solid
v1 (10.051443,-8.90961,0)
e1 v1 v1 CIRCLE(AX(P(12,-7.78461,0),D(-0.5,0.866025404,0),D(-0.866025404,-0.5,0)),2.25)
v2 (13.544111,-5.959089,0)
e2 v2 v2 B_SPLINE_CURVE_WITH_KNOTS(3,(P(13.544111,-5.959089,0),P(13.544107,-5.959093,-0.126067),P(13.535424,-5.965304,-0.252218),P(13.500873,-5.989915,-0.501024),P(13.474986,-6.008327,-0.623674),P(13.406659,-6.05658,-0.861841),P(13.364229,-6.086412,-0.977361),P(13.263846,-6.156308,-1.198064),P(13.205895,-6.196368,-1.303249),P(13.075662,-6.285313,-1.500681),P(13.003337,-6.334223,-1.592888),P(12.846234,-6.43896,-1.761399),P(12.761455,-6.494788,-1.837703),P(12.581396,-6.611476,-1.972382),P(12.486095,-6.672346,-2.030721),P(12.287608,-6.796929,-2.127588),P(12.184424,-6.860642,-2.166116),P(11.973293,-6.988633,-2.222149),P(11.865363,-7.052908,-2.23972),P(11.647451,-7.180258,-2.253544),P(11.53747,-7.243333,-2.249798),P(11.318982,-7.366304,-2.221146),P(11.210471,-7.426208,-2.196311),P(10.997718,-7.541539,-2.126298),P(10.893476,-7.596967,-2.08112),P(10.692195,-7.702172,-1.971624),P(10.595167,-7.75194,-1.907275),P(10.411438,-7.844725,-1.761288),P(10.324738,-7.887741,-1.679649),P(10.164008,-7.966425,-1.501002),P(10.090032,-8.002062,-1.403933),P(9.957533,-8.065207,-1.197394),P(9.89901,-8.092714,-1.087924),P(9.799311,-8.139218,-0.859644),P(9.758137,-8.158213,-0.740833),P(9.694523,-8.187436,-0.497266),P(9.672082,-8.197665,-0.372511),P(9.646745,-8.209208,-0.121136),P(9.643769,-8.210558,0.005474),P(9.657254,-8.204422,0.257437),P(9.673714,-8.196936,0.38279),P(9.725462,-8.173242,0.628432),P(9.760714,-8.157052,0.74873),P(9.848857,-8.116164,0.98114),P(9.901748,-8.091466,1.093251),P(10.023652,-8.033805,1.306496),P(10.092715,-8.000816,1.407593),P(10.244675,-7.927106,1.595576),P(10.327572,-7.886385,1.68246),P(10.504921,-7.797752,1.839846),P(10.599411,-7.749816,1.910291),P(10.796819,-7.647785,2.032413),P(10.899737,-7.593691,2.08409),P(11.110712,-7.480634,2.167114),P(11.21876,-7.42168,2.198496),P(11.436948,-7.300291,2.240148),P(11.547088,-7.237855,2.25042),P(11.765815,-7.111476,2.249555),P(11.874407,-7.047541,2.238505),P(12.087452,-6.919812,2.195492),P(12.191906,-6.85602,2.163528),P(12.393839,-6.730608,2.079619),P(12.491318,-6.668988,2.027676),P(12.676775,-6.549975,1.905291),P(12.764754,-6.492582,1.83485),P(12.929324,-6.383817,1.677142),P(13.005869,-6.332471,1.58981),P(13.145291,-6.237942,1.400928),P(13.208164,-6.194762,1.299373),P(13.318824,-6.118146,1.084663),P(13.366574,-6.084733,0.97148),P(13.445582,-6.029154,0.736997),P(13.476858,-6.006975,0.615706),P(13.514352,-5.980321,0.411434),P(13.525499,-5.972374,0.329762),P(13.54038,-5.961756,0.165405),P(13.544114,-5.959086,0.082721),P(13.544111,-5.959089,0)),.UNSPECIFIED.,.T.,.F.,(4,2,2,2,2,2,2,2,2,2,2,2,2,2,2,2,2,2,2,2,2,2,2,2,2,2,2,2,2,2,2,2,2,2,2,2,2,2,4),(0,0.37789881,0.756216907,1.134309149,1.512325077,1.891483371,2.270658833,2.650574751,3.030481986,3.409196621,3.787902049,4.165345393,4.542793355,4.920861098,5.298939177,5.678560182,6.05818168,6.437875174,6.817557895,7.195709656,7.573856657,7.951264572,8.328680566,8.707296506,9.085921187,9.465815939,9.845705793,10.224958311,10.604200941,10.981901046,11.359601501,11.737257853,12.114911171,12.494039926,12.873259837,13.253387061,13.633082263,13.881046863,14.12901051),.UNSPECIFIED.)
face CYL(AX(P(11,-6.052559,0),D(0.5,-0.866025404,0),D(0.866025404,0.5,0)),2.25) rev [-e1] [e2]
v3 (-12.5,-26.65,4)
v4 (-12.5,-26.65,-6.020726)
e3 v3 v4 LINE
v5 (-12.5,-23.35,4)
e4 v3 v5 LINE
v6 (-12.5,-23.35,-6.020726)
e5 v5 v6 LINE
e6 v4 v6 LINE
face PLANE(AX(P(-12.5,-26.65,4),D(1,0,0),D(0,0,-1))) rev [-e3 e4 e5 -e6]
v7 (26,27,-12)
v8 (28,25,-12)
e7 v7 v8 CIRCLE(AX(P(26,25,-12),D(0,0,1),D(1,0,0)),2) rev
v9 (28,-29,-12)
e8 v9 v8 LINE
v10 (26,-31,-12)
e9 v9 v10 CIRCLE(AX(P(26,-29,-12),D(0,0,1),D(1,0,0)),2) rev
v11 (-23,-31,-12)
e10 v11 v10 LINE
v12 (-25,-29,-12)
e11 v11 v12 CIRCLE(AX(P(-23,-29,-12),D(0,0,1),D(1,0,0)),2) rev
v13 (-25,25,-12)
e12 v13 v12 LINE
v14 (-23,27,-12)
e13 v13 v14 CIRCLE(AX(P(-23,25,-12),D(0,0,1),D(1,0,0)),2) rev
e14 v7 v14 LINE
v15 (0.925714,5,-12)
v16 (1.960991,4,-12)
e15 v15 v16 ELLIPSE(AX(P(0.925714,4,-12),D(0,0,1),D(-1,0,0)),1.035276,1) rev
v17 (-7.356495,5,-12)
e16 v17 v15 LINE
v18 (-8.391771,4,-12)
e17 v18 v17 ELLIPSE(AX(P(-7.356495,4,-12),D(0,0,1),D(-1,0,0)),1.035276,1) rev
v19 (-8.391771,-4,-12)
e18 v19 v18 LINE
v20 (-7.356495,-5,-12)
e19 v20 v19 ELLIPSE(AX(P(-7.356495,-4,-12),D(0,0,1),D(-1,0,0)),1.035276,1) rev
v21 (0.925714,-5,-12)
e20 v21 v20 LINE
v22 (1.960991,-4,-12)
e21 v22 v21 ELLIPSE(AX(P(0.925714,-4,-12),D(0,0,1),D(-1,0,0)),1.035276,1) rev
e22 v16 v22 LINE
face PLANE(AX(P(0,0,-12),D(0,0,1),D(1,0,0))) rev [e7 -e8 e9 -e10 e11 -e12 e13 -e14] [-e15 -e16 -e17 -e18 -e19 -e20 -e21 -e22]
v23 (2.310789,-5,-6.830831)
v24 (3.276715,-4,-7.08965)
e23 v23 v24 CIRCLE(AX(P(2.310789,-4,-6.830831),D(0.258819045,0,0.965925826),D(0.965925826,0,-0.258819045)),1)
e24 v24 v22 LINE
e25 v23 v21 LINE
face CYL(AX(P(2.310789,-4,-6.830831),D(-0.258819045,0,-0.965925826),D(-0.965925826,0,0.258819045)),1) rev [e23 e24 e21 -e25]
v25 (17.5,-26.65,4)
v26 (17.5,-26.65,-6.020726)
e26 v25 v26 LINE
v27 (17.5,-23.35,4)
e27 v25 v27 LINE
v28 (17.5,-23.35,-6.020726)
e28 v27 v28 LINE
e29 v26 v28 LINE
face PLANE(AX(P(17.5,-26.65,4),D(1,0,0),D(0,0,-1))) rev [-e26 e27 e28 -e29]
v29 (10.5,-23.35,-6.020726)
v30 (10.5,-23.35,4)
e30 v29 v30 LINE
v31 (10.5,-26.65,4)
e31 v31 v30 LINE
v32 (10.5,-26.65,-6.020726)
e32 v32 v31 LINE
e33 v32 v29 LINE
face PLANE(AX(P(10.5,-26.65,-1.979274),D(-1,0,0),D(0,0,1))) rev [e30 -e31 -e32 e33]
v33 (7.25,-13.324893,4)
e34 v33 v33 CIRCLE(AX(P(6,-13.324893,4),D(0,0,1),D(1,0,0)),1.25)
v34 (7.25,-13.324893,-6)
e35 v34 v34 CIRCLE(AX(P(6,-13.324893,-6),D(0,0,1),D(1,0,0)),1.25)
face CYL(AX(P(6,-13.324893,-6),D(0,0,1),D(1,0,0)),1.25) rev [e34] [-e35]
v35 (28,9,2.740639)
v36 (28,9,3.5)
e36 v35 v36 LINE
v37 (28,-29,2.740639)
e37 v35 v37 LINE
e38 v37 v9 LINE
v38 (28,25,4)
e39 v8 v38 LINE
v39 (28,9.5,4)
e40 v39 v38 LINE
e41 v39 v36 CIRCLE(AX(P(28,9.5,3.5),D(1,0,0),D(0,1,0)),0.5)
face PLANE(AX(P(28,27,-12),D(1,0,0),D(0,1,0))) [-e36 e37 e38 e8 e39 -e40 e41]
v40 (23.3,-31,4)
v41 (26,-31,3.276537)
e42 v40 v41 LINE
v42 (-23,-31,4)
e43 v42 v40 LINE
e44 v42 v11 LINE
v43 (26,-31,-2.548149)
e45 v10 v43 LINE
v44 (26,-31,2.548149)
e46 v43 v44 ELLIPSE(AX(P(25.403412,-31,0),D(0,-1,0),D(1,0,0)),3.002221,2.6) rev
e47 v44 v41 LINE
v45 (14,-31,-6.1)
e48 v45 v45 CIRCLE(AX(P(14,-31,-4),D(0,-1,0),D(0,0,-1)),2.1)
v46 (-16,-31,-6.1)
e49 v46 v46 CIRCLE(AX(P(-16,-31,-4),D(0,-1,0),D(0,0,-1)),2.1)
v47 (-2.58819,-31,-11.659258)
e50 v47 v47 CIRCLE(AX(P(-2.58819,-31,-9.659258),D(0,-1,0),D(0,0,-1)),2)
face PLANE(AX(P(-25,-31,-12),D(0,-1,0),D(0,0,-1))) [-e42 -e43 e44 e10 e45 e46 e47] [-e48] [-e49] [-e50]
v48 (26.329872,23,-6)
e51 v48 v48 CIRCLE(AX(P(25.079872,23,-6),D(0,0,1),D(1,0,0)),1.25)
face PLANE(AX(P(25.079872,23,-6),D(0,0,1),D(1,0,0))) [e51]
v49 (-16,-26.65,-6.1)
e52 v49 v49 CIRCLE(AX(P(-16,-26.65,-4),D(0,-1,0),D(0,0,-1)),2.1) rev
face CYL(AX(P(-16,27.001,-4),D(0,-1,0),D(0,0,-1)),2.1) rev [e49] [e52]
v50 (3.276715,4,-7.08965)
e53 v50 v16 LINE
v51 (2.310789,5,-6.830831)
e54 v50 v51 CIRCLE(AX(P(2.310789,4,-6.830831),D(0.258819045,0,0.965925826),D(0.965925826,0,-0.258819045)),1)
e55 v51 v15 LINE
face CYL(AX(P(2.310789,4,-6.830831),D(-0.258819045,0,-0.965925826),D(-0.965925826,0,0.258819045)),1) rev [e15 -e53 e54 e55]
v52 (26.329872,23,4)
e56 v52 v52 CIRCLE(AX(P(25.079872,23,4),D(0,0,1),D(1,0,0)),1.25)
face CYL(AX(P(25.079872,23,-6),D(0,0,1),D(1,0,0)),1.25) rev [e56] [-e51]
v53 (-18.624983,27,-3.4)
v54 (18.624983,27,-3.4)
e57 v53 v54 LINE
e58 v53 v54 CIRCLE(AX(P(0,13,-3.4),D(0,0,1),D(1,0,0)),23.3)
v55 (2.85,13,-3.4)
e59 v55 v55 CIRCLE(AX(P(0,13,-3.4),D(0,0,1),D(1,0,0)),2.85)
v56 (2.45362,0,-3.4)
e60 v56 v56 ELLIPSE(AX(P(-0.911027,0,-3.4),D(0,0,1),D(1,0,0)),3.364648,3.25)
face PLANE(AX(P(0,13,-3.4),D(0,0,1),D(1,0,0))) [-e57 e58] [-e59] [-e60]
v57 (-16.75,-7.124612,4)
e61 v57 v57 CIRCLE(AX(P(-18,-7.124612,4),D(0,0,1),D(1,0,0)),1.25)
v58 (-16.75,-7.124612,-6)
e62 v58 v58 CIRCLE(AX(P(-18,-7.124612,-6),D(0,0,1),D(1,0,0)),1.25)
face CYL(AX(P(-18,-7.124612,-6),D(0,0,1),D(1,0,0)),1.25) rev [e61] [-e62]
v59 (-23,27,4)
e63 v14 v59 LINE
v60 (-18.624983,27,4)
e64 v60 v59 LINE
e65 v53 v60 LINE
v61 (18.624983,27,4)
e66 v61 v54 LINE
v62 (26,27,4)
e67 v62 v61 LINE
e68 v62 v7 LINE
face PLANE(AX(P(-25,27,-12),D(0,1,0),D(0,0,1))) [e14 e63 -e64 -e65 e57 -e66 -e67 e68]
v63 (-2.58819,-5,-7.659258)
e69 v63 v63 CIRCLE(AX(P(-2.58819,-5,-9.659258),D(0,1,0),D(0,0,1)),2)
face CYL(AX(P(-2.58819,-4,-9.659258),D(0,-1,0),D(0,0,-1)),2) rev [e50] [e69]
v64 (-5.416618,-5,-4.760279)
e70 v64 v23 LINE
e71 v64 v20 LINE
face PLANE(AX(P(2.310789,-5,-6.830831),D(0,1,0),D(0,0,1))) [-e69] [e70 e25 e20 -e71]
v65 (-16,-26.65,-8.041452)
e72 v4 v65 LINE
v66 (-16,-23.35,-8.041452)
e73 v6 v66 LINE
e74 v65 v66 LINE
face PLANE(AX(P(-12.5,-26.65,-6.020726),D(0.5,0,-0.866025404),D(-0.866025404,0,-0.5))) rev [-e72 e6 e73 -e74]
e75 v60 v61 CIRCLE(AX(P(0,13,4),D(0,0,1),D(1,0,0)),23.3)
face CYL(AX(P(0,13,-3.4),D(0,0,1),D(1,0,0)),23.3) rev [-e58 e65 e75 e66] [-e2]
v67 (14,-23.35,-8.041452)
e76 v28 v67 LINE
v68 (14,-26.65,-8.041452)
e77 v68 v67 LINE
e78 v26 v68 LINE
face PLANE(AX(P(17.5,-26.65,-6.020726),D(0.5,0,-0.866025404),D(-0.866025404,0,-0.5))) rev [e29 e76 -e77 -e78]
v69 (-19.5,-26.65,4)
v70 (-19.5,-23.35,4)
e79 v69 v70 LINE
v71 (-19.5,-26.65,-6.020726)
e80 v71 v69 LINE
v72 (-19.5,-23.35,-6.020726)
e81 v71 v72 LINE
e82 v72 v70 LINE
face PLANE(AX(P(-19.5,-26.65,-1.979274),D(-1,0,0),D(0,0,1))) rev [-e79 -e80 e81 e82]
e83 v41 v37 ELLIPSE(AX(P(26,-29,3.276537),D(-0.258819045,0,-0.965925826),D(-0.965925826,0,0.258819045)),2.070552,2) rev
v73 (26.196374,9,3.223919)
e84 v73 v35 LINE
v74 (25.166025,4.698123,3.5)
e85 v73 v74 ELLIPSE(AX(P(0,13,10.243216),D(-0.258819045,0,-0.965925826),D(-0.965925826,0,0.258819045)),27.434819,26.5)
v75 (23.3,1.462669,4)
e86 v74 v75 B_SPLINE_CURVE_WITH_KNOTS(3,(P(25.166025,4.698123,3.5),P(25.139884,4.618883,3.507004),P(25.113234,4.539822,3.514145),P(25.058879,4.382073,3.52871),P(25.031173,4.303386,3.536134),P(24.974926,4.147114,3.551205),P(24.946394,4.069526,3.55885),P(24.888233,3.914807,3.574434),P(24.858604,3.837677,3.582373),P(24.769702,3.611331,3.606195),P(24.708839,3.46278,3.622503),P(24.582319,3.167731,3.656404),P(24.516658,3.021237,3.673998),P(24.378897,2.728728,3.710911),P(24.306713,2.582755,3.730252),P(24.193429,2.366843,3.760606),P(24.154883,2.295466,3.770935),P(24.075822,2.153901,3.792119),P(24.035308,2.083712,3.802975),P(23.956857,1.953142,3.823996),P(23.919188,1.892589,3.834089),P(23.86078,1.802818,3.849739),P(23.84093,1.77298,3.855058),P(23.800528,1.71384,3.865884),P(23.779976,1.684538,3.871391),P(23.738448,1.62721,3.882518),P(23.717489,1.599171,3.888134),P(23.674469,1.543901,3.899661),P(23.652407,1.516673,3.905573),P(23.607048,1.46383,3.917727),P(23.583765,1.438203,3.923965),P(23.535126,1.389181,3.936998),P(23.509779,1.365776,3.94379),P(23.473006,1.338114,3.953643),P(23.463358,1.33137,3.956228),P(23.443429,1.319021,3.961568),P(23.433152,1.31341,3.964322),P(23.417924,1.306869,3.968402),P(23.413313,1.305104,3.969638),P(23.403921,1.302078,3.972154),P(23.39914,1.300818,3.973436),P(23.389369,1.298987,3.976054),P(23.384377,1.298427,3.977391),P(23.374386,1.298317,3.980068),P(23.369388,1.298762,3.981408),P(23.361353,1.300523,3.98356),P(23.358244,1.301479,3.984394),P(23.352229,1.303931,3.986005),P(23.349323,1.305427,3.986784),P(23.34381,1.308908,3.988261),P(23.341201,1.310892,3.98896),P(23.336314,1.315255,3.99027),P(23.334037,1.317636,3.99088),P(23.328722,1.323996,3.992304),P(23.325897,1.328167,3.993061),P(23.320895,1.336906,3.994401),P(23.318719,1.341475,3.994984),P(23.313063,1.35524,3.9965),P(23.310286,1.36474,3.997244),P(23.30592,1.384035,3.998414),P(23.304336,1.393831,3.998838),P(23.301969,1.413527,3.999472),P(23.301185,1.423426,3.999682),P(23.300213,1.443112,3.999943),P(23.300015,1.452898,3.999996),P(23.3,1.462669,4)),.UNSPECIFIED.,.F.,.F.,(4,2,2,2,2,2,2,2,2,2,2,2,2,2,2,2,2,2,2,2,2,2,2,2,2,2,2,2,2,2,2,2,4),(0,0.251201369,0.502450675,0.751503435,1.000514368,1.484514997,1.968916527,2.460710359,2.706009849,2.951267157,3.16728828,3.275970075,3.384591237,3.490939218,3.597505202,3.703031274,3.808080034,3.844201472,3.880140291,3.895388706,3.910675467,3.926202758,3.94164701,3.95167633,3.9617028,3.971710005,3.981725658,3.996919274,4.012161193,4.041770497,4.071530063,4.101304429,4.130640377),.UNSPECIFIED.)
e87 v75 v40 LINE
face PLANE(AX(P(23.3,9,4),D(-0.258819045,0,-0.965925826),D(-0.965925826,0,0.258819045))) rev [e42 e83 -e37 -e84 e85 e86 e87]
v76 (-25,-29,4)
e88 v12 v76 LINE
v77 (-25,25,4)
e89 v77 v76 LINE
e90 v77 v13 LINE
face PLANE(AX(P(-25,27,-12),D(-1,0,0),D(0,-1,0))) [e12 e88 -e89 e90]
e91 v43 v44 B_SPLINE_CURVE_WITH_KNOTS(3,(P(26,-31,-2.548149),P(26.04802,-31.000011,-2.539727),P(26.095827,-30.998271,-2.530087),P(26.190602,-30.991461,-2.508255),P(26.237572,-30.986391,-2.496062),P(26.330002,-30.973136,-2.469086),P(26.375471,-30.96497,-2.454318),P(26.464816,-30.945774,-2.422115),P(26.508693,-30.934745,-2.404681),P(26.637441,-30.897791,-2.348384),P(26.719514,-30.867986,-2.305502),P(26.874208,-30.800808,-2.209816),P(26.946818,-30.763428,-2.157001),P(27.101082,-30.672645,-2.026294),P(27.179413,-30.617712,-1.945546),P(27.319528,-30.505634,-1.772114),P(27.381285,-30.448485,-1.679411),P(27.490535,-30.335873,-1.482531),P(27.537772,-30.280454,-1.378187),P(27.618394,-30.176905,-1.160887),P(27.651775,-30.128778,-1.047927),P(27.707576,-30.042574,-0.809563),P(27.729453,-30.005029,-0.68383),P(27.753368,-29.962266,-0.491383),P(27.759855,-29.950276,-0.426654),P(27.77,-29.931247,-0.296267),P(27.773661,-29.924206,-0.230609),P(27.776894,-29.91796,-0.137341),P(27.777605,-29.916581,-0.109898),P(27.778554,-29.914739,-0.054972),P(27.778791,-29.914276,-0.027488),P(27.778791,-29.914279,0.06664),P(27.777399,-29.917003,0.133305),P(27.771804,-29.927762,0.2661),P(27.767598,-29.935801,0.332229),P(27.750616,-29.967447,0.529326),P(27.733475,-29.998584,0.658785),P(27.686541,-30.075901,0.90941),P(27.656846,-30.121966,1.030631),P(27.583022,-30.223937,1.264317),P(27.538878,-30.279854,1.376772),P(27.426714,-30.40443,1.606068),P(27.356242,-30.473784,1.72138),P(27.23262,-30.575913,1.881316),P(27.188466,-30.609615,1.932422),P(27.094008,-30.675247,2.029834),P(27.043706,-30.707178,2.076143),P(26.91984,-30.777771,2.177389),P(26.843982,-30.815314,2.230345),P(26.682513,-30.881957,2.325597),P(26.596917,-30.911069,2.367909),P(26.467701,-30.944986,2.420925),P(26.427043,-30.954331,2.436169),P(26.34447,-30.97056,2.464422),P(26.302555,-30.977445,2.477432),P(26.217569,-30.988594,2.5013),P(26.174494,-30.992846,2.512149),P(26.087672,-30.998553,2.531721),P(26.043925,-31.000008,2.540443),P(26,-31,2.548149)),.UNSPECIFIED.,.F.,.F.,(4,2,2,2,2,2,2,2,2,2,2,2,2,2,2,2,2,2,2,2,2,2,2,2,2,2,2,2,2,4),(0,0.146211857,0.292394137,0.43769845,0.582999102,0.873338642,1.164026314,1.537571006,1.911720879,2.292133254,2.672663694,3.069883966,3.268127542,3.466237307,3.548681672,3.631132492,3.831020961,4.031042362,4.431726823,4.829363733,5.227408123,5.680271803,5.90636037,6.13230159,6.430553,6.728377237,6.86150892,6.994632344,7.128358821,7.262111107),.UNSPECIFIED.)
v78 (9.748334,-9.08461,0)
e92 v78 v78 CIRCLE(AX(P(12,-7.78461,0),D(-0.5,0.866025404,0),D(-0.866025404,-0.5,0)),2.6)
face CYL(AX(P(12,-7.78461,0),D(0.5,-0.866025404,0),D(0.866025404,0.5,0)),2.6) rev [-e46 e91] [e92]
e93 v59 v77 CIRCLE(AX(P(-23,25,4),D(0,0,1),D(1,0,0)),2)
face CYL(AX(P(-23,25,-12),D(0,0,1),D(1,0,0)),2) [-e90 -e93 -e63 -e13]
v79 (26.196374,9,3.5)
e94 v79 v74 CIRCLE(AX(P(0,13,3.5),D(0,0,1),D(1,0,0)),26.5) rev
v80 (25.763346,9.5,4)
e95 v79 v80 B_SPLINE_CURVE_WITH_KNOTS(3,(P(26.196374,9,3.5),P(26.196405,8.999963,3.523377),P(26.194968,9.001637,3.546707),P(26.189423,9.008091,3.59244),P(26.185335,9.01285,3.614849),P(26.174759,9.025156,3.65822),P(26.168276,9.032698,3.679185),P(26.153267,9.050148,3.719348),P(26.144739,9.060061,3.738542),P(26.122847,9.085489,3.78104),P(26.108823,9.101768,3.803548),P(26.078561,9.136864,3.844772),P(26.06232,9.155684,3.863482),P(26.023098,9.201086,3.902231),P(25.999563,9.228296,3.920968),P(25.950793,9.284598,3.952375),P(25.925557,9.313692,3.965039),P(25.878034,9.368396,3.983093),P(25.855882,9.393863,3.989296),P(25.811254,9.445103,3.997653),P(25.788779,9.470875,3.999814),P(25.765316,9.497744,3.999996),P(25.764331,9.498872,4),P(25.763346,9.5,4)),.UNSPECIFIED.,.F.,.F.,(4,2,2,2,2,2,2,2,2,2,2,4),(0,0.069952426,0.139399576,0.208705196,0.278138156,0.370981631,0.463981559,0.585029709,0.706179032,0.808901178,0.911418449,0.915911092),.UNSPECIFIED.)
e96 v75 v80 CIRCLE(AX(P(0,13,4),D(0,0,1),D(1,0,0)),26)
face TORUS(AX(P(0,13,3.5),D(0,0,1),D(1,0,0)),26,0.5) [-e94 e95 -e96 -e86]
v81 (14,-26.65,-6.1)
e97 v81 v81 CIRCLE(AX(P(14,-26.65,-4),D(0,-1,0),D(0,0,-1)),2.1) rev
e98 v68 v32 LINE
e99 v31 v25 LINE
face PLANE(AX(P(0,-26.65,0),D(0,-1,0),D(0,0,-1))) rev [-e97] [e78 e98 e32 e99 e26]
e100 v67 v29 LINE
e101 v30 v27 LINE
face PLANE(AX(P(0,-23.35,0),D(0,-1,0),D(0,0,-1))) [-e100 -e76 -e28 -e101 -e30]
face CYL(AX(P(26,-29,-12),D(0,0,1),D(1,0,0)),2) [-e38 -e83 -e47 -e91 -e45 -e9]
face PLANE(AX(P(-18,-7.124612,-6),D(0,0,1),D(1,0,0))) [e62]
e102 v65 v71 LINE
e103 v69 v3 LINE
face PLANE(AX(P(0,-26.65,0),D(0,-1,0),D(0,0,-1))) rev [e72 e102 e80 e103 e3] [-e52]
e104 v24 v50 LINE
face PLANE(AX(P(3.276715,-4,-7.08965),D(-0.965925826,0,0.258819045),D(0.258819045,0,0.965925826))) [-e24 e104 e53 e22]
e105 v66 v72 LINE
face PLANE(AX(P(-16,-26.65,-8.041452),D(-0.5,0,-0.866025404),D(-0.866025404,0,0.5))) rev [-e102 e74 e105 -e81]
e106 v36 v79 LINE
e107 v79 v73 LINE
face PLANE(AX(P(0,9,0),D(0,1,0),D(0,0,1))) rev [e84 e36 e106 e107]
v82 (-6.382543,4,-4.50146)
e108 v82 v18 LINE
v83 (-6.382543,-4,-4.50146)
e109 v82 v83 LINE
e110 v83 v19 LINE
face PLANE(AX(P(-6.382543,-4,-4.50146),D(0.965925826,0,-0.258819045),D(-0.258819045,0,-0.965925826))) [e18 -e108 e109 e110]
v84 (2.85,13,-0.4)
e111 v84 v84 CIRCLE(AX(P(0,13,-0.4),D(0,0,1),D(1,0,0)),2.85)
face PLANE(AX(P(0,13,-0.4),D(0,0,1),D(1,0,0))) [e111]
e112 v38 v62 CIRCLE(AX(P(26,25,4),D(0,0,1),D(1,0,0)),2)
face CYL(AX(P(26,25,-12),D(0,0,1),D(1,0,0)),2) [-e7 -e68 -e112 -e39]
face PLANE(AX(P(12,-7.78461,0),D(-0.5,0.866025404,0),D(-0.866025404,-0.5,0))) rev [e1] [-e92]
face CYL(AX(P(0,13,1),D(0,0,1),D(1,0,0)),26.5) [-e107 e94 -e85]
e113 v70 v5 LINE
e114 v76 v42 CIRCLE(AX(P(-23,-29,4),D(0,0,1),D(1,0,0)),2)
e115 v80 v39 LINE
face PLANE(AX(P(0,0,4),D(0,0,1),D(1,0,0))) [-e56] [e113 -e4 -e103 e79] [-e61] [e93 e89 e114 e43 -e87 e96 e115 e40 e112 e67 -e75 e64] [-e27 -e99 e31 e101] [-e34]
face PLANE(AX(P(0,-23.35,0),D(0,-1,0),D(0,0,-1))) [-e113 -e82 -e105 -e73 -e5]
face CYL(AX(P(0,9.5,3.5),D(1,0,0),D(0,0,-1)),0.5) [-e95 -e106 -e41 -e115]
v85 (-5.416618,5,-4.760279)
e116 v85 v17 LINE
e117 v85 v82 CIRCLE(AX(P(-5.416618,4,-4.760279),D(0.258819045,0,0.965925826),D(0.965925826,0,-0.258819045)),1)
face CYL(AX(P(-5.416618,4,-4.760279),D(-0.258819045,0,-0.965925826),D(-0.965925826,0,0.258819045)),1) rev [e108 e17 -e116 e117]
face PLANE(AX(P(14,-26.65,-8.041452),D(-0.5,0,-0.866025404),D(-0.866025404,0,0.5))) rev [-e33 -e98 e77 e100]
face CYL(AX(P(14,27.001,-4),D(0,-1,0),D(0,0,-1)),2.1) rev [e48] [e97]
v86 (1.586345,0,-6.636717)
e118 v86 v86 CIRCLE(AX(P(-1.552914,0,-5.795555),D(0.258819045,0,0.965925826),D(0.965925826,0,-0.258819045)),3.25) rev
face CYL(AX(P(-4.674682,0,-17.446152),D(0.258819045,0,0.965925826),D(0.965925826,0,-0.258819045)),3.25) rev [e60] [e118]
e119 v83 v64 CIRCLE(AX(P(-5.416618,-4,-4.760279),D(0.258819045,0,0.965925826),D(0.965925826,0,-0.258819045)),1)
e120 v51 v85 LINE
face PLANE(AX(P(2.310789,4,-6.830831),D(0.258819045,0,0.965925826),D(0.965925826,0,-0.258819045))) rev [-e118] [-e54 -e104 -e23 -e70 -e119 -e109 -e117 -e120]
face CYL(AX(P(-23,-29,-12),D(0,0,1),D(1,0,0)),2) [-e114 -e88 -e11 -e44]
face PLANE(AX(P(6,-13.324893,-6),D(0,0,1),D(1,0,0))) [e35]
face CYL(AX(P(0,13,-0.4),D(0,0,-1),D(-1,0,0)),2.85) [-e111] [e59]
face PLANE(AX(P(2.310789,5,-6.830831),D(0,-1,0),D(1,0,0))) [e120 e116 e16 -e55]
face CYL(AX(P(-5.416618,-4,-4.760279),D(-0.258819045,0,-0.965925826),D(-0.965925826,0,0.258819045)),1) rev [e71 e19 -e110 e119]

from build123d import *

# Parameters (mm, degrees)
BOSS_EXTRUDE1_DEPTH      = 4
BOSS_EXTRUDE1_DEPTH_BACK = 12
SKETCH1_W                = 53
SKETCH1_H                = 58
CUT_EXTRUDE1_DEPTH       = 4
CUT_EXTRUDE1_DEPTH_BACK  = 3.4
SKETCH2_R                = 23.3
SKETCH3_R                = 2.85
BOSS_EXTRUDE2_DEPTH      = 3
SKETCH4_R                = 2.25
CUT_EXTRUDE2_DEPTH       = 32
SKETCH5_R                = 2.6
CUT_EXTRUDE3_DEPTH       = 30
SKETCH6_R                = 3.25
CUT_EXTRUDE4_DEPTH       = 44.462627624
CUT_EXTRUDE5_DEPTH       = 8
SKETCH11_R               = 1.5
CUT_EXTRUDE6_DEPTH       = 27
SKETCH12_R               = 2
CUT_EXTRUDE7_DEPTH       = 27
SKETCH13_R               = 1.25
CUT_EXTRUDE8_DEPTH       = 10
FILLET1_R                = 2
CUT_EXTRUDE9_DEPTH       = 40
BOSS_EXTRUDE3_START      = -3
BOSS_EXTRUDE3_DEPTH      = 3
FILLET3_R                = 0.5
CUT_EXTRUDE11_DEPTH      = 1.65
CUT_EXTRUDE12_REACH      = 67.513
SKETCH18_R               = 2.1


with BuildPart() as part:
    # Sketch1 → Boss-Extrude1 (new, two sides: drawn at the far end of the back side and taken through both)
    with BuildSketch(Plane.XY.offset(-BOSS_EXTRUDE1_DEPTH_BACK)):
        with Locations((1.5, -2)):
            Rectangle(SKETCH1_W, SKETCH1_H)
    extrude(amount=BOSS_EXTRUDE1_DEPTH + BOSS_EXTRUDE1_DEPTH_BACK)

    # Sketch2 → Cut-Extrude1 (cut, two sides: drawn at the far end of the back side and taken through both)
    with BuildSketch(Plane.XY.offset(-CUT_EXTRUDE1_DEPTH_BACK)):
        with Locations((0, 13)):
            Circle(SKETCH2_R)
    extrude(amount=CUT_EXTRUDE1_DEPTH + CUT_EXTRUDE1_DEPTH_BACK, mode=Mode.SUBTRACT)

    # Sketch3 → Boss-Extrude2 (add)
    with BuildSketch(Plane.XY.offset(-3.4)):
        with Locations((0, 13)):
            Circle(SKETCH3_R)
    extrude(amount=BOSS_EXTRUDE2_DEPTH)

    # Sketch4 → Cut-Extrude2 (cut)
    with BuildSketch(Plane(origin=(21.370834875, -37.015371804, 0), x_dir=(0, 0, 1), z_dir=(-0.500000000000001, 0.866025403784438, 0))):
        with Locations(Location((0, 6.5, 0), (0, 0, 90))):
            Circle(SKETCH4_R)
    extrude(amount=CUT_EXTRUDE2_DEPTH, mode=Mode.SUBTRACT)

    # Sketch5 → Cut-Extrude3 (cut)
    with BuildSketch(Plane(origin=(21.370834875, -37.015371804, 0), x_dir=(0, 0, 1), z_dir=(-0.500000000000001, 0.866025403784438, 0))):
        with Locations(Location((0, 6.5, 0), (0, 0, 120.129971207))):
            Circle(SKETCH5_R)
    extrude(amount=CUT_EXTRUDE3_DEPTH, mode=Mode.SUBTRACT)

    # Sketch6 → Cut-Extrude4 (cut, through all)
    with BuildSketch(Plane(origin=(0, 0, 0), x_dir=(0, -1, 0), z_dir=(0.25881904510252135, 0, 0.9659258262890681))):
        with Locations(Location((0, 0, 0), (0, 0, 90))):
            Circle(SKETCH6_R)
    extrude(amount=-CUT_EXTRUDE4_DEPTH, mode=Mode.SUBTRACT)

    # Sketch10 → Cut-Extrude5 (cut)
    with BuildSketch(Plane(origin=(-3.623466631, 0, -13.522961568), x_dir=(0, -1, 0), z_dir=(0.25881904510252135, 0, 0.9659258262890681))):
        with BuildLine():
            Line((4, 5), (-4, 5))
            ThreePointArc((-4, 5), (-4.707106781, 4.707106781), (-5, 4))
            Line((-5, 4), (-5, -4))
            ThreePointArc((-5, -4), (-4.707106781, -4.707106781), (-4, -5))
            Line((-4, -5), (4, -5))
            ThreePointArc((4, -5), (4.707106781, -4.707106781), (5, -4))
            Line((5, -4), (5, 4))
            ThreePointArc((5, 4), (4.707106781, 4.707106781), (4, 5))
        make_face()
    extrude(amount=CUT_EXTRUDE5_DEPTH, mode=Mode.SUBTRACT)

    # Sketch11 → Cut-Extrude6 (cut)
    with BuildSketch(Plane.XZ.offset(31)):
        with Locations(Location((-2.588190451, -9.659258263, 0), (0, 0, 270))):
            Circle(SKETCH11_R)
    extrude(amount=-CUT_EXTRUDE6_DEPTH, mode=Mode.SUBTRACT)

    # Sketch12 → Cut-Extrude7 (cut)
    with BuildSketch(Plane.XZ.offset(31)):
        with Locations(Location((-2.588190451, -9.659258263, 0), (0, 0, 270))):
            Circle(SKETCH12_R)
    extrude(amount=-CUT_EXTRUDE7_DEPTH, mode=Mode.SUBTRACT)

    # Sketch13 → Cut-Extrude8 (cut)
    with BuildSketch(Plane.XY.offset(4)):
        with Locations((25.079872408, 23)):
            Circle(SKETCH13_R)
        with Locations((-18, -7.124611797)):
            Circle(SKETCH13_R)
        with Locations((6, -13.324893162)):
            Circle(SKETCH13_R)
    extrude(amount=-CUT_EXTRUDE8_DEPTH, mode=Mode.SUBTRACT)

    # Fillet1
    # the kernel refuses this fillet: 2 mm, written as the material it takes off along each edge
    with BuildSketch(Plane(origin=(28, -31, 9), x_dir=(0, 1, 0), z_dir=(0, 0, -1))) as fillet1_piece_1:
        with BuildLine():
            CenterArc((FILLET1_R, -FILLET1_R), FILLET1_R, 90, 90)
            Line((0, -FILLET1_R), (0, 0))
            Line((0, 0), (FILLET1_R, 0))
        make_face()
    extrude(amount=12.694895612, mode=Mode.SUBTRACT)
    with BuildSketch(Plane(origin=(-25, 27, -17), x_dir=(1, 0, 0), z_dir=(0, 0, 1)), Plane(origin=(28, 27, 9), x_dir=(-1, 0, 0), z_dir=(0, 0, -1)), Plane(origin=(-25, -31, -17), x_dir=(0, 1, 0), z_dir=(0, 0, 1))) as fillet1_piece_2:
        with BuildLine():
            CenterArc((FILLET1_R, -FILLET1_R), FILLET1_R, 90, 90)
            Line((0, -FILLET1_R), (0, 0))
            Line((0, 0), (FILLET1_R, 0))
        make_face()
    extrude(amount=26, mode=Mode.SUBTRACT)
    with BuildSketch(Plane(origin=(28, -31, 3.694895612), x_dir=(0, 1, 0), z_dir=(0, 0, -1))) as fillet1_piece_3:
        with BuildLine():
            CenterArc((FILLET1_R, -FILLET1_R), FILLET1_R, 90, 90)
            Line((0, -FILLET1_R), (0, 0))
            Line((0, 0), (FILLET1_R, 0))
        make_face()
    extrude(amount=20.694895612, mode=Mode.SUBTRACT)

    # Sketch14 → Cut-Extrude9 (cut)
    with BuildSketch(Plane.XZ.offset(31)):
        Polygon((23.3, 4), (28, 2.740638796), (28, 4), align=None)
    extrude(amount=-CUT_EXTRUDE9_DEPTH, mode=Mode.SUBTRACT)

    # Sketch15 → Boss-Extrude3 (add)
    with BuildSketch(Plane.XY.offset(4).offset(BOSS_EXTRUDE3_START)):
        with BuildLine():
            Line((23.246505231, 11.422028337), (26.452977251, 11.422028337))
            ThreePointArc((26.452977251, 11.422028337), (25.46678498, 5.672458614), (23.246505231, 0.277972073))
            Line((23.246505231, 0.277972073), (20.59705621, 2.107283375))
            ThreePointArc((20.59705621, 2.107283375), (22.41105951, 6.625487343), (23.246505231, 11.422028337))
        make_face()
    extrude(amount=BOSS_EXTRUDE3_DEPTH)

    # Fillet3
    fillet3_edges = [part.edges().sort_by_distance(p)[0] for p in [
        (27.098186897, 9, 4),
        (25.121010739, 4.562890339, 4),
    ]]
    fillet(fillet3_edges, radius=FILLET3_R)

    # Sketch17 → Cut-Extrude11 (cut, symmetric)
    with BuildSketch(Plane(origin=(0, -25, 0), x_dir=(1, 0, 0), z_dir=(0, 1, 0))):
        Polygon((-12.5, 6.020725942), (-16, 8.041451884), (-19.5, 6.020725942), (-19.5, 1.979274058), (-19.5, -4), (-12.5, -4), (-12.5, 1.979274058), align=None)
        Polygon((17.5, 6.020725942), (14, 8.041451884), (10.5, 6.020725942), (10.5, 1.979274058), (10.5, -4), (17.5, -4), (17.5, 1.979274058), align=None)
    extrude(amount=CUT_EXTRUDE11_DEPTH, both=True, mode=Mode.SUBTRACT)

    # Sketch18 → Cut-Extrude12 (cut, up to next)
    with BuildSketch(Plane.XZ.offset(31), mode=Mode.PRIVATE) as cut_extrude12_sk1:
        with Locations(Location((-16, -4, 0), (0, 0, 270))):
            Circle(SKETCH18_R)
    cut_extrude12_tool1 = extrude(cut_extrude12_sk1.sketch, amount=-CUT_EXTRUDE12_REACH, mode=Mode.PRIVATE) & part.part
    # Sketch18 → Cut-Extrude12 (cut, up to next)
    with BuildSketch(Plane.XZ.offset(31), mode=Mode.PRIVATE) as cut_extrude12_sk2:
        with Locations(Location((14, -4, 0), (0, 0, 270))):
            Circle(SKETCH18_R)
    cut_extrude12_tool2 = extrude(cut_extrude12_sk2.sketch, amount=-CUT_EXTRUDE12_REACH, mode=Mode.PRIVATE) & part.part
    add(cut_extrude12_tool1.solids().sort_by_distance((-16, -31, -4))[0], mode=Mode.SUBTRACT)
    add(cut_extrude12_tool2.solids().sort_by_distance((14, -31, -4))[0], mode=Mode.SUBTRACT)


solid = part.part
